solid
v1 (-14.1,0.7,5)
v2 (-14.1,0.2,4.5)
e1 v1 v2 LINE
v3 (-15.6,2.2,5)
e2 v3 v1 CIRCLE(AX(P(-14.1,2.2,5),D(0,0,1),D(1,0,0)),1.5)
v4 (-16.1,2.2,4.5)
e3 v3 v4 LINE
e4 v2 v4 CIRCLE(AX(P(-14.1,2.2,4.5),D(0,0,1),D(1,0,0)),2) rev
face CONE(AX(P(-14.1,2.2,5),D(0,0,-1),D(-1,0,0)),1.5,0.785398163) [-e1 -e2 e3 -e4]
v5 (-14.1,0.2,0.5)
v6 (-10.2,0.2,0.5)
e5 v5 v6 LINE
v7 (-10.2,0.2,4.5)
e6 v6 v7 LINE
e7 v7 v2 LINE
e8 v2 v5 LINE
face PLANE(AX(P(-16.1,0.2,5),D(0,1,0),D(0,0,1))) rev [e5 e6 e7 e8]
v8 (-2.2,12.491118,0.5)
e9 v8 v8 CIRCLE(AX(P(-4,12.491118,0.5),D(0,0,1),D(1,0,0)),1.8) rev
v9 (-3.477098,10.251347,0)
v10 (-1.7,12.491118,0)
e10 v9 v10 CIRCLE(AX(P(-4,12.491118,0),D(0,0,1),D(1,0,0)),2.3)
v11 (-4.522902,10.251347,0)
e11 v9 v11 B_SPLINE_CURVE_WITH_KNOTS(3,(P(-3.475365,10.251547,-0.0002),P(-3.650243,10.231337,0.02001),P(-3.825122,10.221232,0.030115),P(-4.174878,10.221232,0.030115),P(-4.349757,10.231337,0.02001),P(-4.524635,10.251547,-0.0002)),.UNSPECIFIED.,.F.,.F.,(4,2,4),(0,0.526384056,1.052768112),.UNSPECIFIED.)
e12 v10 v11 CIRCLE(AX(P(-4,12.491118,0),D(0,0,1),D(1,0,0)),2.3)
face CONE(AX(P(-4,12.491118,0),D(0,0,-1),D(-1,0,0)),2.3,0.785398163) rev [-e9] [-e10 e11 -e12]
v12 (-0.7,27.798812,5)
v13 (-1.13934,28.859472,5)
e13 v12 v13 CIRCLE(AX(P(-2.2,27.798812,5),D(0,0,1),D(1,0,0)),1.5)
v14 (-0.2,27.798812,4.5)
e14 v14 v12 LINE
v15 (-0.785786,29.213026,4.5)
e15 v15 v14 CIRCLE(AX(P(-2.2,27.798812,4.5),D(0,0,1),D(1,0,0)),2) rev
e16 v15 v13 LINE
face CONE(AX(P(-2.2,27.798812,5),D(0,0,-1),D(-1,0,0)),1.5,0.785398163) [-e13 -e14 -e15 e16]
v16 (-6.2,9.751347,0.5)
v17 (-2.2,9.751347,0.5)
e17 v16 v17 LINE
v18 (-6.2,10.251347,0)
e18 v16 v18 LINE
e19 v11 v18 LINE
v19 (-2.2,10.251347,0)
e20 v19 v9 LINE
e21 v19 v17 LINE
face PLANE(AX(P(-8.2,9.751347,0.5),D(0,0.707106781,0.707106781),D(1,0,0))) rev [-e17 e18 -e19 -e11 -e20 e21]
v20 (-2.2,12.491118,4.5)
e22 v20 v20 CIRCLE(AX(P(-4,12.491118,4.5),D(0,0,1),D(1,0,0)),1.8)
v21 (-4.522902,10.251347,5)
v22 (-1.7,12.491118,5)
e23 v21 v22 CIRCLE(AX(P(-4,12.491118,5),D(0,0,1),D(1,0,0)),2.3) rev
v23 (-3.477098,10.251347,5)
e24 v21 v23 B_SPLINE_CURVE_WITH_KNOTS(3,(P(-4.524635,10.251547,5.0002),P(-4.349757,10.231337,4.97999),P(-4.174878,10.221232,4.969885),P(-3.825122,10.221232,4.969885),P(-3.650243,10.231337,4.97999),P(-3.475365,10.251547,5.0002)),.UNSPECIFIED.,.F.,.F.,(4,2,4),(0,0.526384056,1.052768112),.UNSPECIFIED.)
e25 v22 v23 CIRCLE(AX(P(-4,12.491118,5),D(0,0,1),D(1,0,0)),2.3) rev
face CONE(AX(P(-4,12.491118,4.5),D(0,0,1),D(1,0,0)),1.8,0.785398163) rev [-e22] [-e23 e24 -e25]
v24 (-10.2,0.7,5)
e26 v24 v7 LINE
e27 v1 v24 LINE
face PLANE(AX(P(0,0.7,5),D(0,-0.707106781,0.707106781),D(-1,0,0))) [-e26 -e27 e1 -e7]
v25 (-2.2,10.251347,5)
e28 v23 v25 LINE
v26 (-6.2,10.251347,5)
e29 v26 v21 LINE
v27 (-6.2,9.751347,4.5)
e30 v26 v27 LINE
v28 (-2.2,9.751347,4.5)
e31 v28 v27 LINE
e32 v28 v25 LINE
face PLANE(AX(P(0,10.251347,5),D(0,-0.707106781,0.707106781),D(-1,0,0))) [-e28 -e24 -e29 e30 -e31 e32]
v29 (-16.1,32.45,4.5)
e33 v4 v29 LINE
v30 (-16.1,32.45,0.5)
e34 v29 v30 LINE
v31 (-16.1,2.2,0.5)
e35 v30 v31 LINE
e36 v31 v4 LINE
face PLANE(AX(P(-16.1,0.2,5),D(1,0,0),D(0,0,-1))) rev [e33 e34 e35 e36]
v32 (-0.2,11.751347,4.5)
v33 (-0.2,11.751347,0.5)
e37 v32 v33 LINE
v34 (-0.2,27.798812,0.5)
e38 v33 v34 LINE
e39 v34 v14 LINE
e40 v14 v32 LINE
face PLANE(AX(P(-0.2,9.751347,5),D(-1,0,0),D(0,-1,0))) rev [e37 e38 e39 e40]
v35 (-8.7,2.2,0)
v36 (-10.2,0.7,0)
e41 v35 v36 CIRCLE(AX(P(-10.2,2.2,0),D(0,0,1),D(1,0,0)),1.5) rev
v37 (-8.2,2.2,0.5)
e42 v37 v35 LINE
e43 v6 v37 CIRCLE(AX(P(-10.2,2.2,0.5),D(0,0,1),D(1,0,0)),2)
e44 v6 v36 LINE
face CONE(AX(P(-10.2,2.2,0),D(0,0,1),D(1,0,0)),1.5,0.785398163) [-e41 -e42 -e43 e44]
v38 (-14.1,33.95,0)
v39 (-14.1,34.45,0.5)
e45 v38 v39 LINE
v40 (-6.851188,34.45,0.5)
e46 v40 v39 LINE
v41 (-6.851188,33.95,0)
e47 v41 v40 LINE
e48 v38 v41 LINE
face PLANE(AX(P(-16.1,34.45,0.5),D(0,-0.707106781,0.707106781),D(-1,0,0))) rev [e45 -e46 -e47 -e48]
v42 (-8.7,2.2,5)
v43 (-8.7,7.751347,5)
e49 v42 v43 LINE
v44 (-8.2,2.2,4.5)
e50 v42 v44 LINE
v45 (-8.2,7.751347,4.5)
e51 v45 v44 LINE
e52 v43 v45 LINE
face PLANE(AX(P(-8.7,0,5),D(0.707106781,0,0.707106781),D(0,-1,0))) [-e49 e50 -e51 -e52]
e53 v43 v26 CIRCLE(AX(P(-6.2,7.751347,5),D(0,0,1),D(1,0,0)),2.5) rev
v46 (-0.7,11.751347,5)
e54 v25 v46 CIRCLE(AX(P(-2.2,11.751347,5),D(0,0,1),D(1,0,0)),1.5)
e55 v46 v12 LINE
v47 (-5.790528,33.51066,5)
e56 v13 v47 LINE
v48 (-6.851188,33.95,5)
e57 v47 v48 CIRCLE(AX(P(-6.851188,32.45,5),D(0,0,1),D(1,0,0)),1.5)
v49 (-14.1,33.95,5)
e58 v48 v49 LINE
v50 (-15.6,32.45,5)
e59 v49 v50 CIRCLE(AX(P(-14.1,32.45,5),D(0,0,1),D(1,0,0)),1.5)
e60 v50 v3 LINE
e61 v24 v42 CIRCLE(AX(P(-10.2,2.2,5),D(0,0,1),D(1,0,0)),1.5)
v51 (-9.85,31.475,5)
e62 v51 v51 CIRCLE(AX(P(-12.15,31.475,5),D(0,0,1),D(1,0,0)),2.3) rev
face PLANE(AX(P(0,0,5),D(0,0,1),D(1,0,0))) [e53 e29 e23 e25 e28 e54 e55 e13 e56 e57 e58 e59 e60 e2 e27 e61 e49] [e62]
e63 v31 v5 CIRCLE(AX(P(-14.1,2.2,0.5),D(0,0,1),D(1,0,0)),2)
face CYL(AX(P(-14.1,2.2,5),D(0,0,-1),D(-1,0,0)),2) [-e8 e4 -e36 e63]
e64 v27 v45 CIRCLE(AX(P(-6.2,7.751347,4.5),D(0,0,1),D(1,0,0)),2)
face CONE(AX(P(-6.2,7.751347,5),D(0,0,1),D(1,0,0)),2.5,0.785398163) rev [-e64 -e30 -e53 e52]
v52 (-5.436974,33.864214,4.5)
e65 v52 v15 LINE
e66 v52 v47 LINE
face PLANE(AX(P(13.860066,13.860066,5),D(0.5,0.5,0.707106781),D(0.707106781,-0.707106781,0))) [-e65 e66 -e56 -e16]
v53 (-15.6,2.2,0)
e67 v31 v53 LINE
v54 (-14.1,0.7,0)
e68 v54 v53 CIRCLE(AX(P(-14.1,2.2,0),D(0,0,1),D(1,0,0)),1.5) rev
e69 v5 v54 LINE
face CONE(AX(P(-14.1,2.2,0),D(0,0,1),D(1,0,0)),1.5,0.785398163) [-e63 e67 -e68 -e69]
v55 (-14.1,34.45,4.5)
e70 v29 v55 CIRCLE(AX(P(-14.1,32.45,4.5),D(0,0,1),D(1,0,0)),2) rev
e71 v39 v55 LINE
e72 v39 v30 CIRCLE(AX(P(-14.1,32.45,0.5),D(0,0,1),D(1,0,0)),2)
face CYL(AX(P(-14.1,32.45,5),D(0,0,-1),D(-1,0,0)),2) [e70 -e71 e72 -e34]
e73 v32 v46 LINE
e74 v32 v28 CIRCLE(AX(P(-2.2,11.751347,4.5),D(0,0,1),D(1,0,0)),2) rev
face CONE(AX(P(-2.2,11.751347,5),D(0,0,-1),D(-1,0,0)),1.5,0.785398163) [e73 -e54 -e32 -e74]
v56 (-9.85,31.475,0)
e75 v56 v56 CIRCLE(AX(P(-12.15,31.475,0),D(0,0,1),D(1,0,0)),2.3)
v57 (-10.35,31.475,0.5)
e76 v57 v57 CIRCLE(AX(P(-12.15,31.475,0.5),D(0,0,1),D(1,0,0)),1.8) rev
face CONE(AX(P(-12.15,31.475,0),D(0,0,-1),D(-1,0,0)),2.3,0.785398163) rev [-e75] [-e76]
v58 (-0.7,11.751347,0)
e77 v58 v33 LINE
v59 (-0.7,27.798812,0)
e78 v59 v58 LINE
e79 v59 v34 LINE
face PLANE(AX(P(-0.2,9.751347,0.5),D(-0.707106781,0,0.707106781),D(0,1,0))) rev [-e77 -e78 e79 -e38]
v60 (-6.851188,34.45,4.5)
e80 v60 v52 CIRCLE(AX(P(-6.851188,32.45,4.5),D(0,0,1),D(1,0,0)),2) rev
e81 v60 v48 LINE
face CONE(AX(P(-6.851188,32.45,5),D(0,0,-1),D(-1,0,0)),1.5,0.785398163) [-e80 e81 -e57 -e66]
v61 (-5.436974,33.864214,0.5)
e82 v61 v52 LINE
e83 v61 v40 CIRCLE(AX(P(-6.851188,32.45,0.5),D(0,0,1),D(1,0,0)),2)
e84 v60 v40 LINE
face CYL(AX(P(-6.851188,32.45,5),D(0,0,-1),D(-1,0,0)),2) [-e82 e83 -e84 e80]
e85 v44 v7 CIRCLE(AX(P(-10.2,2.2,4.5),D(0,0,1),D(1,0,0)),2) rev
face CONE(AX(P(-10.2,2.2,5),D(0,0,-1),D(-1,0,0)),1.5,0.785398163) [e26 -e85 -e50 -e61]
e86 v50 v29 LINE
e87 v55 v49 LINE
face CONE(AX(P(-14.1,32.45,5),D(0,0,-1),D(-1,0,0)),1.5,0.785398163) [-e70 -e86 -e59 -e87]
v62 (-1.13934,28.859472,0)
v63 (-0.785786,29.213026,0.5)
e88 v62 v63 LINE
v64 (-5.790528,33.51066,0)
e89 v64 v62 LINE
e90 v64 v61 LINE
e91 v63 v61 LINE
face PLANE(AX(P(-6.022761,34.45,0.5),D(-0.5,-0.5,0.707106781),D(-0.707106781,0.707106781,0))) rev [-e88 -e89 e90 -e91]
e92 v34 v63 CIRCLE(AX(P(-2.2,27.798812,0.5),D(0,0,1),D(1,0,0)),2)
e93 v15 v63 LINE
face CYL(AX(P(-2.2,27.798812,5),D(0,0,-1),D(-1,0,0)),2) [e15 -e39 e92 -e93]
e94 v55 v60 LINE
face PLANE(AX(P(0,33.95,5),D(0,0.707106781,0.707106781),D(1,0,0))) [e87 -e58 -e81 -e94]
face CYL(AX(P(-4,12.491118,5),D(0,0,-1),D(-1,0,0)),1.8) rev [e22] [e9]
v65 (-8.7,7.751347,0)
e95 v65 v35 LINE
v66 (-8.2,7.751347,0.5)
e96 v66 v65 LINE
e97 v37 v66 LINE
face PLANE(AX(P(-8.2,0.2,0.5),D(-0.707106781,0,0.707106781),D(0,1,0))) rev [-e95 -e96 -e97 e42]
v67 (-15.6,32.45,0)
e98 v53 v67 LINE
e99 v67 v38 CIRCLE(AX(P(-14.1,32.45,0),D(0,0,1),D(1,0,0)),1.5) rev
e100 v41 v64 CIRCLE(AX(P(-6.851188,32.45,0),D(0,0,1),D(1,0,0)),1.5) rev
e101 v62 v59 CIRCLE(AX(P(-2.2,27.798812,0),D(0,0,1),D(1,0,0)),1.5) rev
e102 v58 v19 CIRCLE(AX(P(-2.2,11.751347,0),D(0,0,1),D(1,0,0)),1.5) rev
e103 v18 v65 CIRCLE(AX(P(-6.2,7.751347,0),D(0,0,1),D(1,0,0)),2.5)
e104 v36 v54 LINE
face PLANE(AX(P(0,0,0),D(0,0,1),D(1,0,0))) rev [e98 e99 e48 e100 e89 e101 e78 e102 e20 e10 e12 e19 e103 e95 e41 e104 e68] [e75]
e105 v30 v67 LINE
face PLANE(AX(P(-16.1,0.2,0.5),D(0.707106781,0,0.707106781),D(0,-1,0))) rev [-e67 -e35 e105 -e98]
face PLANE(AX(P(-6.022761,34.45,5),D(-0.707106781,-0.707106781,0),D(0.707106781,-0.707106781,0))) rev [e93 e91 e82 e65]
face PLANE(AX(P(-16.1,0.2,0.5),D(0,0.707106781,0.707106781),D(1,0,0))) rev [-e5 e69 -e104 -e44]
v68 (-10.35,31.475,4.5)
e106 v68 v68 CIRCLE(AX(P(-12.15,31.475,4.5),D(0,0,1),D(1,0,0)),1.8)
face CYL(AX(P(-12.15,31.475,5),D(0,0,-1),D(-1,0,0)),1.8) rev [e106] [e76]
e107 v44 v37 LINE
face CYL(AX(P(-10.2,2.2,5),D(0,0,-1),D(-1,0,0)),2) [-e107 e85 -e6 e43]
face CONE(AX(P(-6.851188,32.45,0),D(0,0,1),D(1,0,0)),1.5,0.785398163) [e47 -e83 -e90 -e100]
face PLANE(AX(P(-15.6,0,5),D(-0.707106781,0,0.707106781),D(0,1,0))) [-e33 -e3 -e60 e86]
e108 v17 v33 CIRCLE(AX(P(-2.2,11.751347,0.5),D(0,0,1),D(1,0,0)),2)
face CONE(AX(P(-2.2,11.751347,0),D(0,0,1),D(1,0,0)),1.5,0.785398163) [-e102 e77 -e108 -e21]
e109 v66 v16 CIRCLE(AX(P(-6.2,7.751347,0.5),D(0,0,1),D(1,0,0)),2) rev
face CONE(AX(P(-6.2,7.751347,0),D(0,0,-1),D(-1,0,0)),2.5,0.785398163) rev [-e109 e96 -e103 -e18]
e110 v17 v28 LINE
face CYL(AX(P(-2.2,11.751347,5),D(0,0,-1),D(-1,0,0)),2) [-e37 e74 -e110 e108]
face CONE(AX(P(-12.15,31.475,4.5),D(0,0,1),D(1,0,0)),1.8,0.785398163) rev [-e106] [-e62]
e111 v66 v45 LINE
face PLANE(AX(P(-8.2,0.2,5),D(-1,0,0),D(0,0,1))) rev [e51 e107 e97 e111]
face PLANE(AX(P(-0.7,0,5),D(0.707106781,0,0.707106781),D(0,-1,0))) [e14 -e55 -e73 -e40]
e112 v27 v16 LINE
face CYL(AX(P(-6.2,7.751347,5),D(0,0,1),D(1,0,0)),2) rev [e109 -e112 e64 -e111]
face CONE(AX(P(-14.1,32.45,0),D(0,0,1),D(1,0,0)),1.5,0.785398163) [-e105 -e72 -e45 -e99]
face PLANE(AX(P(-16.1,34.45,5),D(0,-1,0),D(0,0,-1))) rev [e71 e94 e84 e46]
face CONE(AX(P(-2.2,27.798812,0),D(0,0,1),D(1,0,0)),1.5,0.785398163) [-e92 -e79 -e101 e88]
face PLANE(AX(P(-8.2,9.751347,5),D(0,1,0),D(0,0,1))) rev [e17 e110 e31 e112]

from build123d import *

# Parameters (mm, degrees)
SKIZZE1_R                       = 1.8
AUFSATZ_LINEAR_AUSTRAGEN1_DEPTH = 5
VERRUNDUNG1_R                   = 2
FASE1_SIZE                      = 0.5


with BuildPart() as part:
    # Skizze1 → Aufsatz-Linear austragen1 (new body)
    with BuildSketch(Plane.XY):
        Polygon((-0.2, 9.751346921), (-0.2, 28.627239348), (-6.022760652, 34.45), (-16.1, 34.45), (-16.1, 0.2), (-8.2, 0.2), (-8.2, 9.751346921), align=None)
        with Locations((-12.15, 31.475)):
            Circle(SKIZZE1_R, mode=Mode.SUBTRACT)
        with Locations((-4, 12.49111782)):
            Circle(SKIZZE1_R, mode=Mode.SUBTRACT)
    extrude(amount=AUFSATZ_LINEAR_AUSTRAGEN1_DEPTH)

    # Verrundung1
    verrundung1_edges = [part.edges().sort_by_distance(p)[0] for p in [
        (-8.2, 9.751346921, 2.5),
        (-8.2, 0.2, 2.5),
        (-16.1, 0.2, 2.5),
        (-16.1, 34.45, 2.5),
        (-6.022760652, 34.45, 2.5),
        (-0.2, 28.627239348, 2.5),
        (-0.2, 9.751346921, 2.5),
    ]]
    fillet(verrundung1_edges, radius=VERRUNDUNG1_R)

    # Fase1
    # the kernel refuses this chamfer: 0.5 mm, written as the material it takes off along each edge
    with BuildSketch(Plane(origin=(-12.15, 31.475, 0), x_dir=(1, 0, 0), z_dir=(0, -1, 0))) as fase1_piece_1:
        Polygon((1.8 + FASE1_SIZE, 0), (1.8, FASE1_SIZE), (1.8, 0), align=None)
    revolve(axis=Axis((-12.15, 31.475, 0), (0, 0, 1)), mode=Mode.SUBTRACT)
    with BuildSketch(Plane(origin=(-12.15, 31.475, 5), x_dir=(1, 0, 0), z_dir=(0, -1, 0))) as fase1_piece_2:
        Polygon((1.8 + FASE1_SIZE, 0), (1.8, -FASE1_SIZE), (1.8, 0), align=None)
    revolve(axis=Axis((-12.15, 31.475, 5), (0, 0, 1)), mode=Mode.SUBTRACT)
    with BuildSketch(Plane(origin=(-4, 12.49111782, 0), x_dir=(1, 0, 0), z_dir=(0, -1, 0))) as fase1_piece_3:
        Polygon((1.8 + FASE1_SIZE, 0), (1.8, FASE1_SIZE), (1.8, 0), align=None)
    revolve(axis=Axis((-4, 12.49111782, 0), (0, 0, 1)), mode=Mode.SUBTRACT)
    with BuildSketch(Plane(origin=(-4, 12.49111782, 5), x_dir=(1, 0, 0), z_dir=(0, -1, 0))) as fase1_piece_4:
        Polygon((1.8 + FASE1_SIZE, 0), (1.8, -FASE1_SIZE), (1.8, 0), align=None)
    revolve(axis=Axis((-4, 12.49111782, 5), (0, 0, 1)), mode=Mode.SUBTRACT)
    with BuildSketch(Plane(origin=(-0.2, 11.751346921, 0), x_dir=(0.027495876610586382, 0, 0.9996219169112968), z_dir=(0, 1, 0))) as fase1_piece_5:
        Polygon((FASE1_SIZE * 0.999621916911, -FASE1_SIZE * 0.0274958766106), (-FASE1_SIZE * 0.0274958766106, -FASE1_SIZE * 0.999621916911), (0, 0), align=None)
    extrude(amount=16.047465302, mode=Mode.SUBTRACT)
    with BuildSketch(Plane(origin=(-0.2, 11.751346921, 5), x_dir=(0.027495876610586403, 0, -0.9996219169112968), z_dir=(0, 1, 0))) as fase1_piece_6:
        Polygon((FASE1_SIZE * 0.999621916911, FASE1_SIZE * 0.0274958766106), (-FASE1_SIZE * 0.0274958766106, FASE1_SIZE * 0.999621916911), (0, 0), align=None)
    extrude(amount=16.047465302, mode=Mode.SUBTRACT)
    with BuildSketch(Plane(origin=(-6.2, 9.751346921, 0), x_dir=(0, 0.9996219169112968, -0.02749587661058639), z_dir=(1, 0, 0))) as fase1_piece_7:
        Polygon((FASE1_SIZE * 0.999621916911, FASE1_SIZE * 0.0274958766106), (-FASE1_SIZE * 0.0274958766106, FASE1_SIZE * 0.999621916911), (0, 0), align=None)
    extrude(amount=4, mode=Mode.SUBTRACT)
    with BuildSketch(Plane(origin=(-8.2, 2.2, 0), x_dir=(-0.9996219169112968, 0, -0.02749587661058639), z_dir=(0, 1, 0))) as fase1_piece_8:
        Polygon((FASE1_SIZE * 0.999621916911, FASE1_SIZE * 0.0274958766106), (-FASE1_SIZE * 0.0274958766106, FASE1_SIZE * 0.999621916911), (0, 0), align=None)
    extrude(amount=5.551346921, mode=Mode.SUBTRACT)
    with BuildSketch(Plane(origin=(-14.1, 0.2, 0), x_dir=(0, 0.9996219169112968, -0.027495876610586372), z_dir=(1, 0, 0))) as fase1_piece_9:
        Polygon((FASE1_SIZE * 0.999621916911, FASE1_SIZE * 0.0274958766106), (-FASE1_SIZE * 0.0274958766106, FASE1_SIZE * 0.999621916911), (0, 0), align=None)
    extrude(amount=3.9, mode=Mode.SUBTRACT)
    with BuildSketch(Plane(origin=(-16.1, 32.45, 0), x_dir=(0.9996219169112968, 0, -0.02749587661058639), z_dir=(0, -1, 0))) as fase1_piece_10:
        Polygon((FASE1_SIZE * 0.999621916911, FASE1_SIZE * 0.0274958766106), (-FASE1_SIZE * 0.0274958766106, FASE1_SIZE * 0.999621916911), (0, 0), align=None)
    extrude(amount=30.25, mode=Mode.SUBTRACT)
    with BuildSketch(Plane(origin=(-6.851187777, 34.45, 0), x_dir=(0, -0.9996219169112968, -0.027495876610586483), z_dir=(-1, 0, 0))) as fase1_piece_11:
        Polygon((FASE1_SIZE * 0.999621916911, FASE1_SIZE * 0.0274958766106), (-FASE1_SIZE * 0.0274958766106, FASE1_SIZE * 0.999621916911), (0, 0), align=None)
    extrude(amount=7.248812223, mode=Mode.SUBTRACT)
    with BuildSketch(Plane(origin=(-0.785786438, 29.213025785, 0), x_dir=(-0.7068394360706736, -0.7068394360706733, -0.027495876610586348), z_dir=(-0.7071067811865475, 0.7071067811865477, 0))) as fase1_piece_12:
        Polygon((FASE1_SIZE * 0.999621916911, FASE1_SIZE * 0.0274958766106), (-FASE1_SIZE * 0.0274958766106, FASE1_SIZE * 0.999621916911), (0, 0), align=None)
    extrude(amount=6.577772835, mode=Mode.SUBTRACT)
    with BuildSketch(Plane(origin=(-2.2, 27.798812223, 0), x_dir=(1, 0, 0), z_dir=(0, -1, 0))) as fase1_piece_13:
        Polygon((2 - FASE1_SIZE, 0), (2, FASE1_SIZE), (2, 0), align=None)
    revolve(axis=Axis((-2.2, 27.798812223, 0), (0, 0, 1)), revolution_arc=45, mode=Mode.SUBTRACT)
    with BuildSketch(Plane(origin=(-6.851187777, 32.45, 0), x_dir=(0.7071067811865487, 0.7071067811865465, 0), z_dir=(0.7071067811865465, -0.7071067811865487, 0))) as fase1_piece_14:
        Polygon((2 - FASE1_SIZE, 0), (2, FASE1_SIZE), (2, 0), align=None)
    revolve(axis=Axis((-6.851187777, 32.45, 0), (0, 0, 1)), revolution_arc=45, mode=Mode.SUBTRACT)
    with BuildSketch(Plane(origin=(-14.1, 32.45, 0), x_dir=(0, 1, 0), z_dir=(1, 0, 0))) as fase1_piece_15:
        Polygon((2 - FASE1_SIZE, 0), (2, FASE1_SIZE), (2, 0), align=None)
    revolve(axis=Axis((-14.1, 32.45, 0), (0, 0, 1)), revolution_arc=90, mode=Mode.SUBTRACT)
    with BuildSketch(Plane(origin=(-14.1, 2.2, 0), x_dir=(-1, 0, 0), z_dir=(0, 1, 0))) as fase1_piece_16:
        Polygon((2 - FASE1_SIZE, 0), (2, FASE1_SIZE), (2, 0), align=None)
    revolve(axis=Axis((-14.1, 2.2, 0), (0, 0, 1)), revolution_arc=90, mode=Mode.SUBTRACT)
    with BuildSketch(Plane(origin=(-10.2, 2.2, 0), x_dir=(0, -1, 0), z_dir=(-1, 0, 0))) as fase1_piece_17:
        Polygon((2 - FASE1_SIZE, 0), (2, FASE1_SIZE), (2, 0), align=None)
    revolve(axis=Axis((-10.2, 2.2, 0), (0, 0, 1)), revolution_arc=90, mode=Mode.SUBTRACT)
    with BuildSketch(Plane(origin=(-2.2, 11.751346921, 0), x_dir=(1, 0, 0), z_dir=(0, 1, 0))) as fase1_piece_18:
        Polygon((2 - FASE1_SIZE, 0), (2, -FASE1_SIZE), (2, 0), align=None)
    revolve(axis=Axis((-2.2, 11.751346921, 0), (0, 0, -1)), revolution_arc=90, mode=Mode.SUBTRACT)
    with BuildSketch(Plane(origin=(-6.2, 9.751346921, 5), x_dir=(0, 0.9996219169112968, 0.027495876610585647), z_dir=(1, 0, 0))) as fase1_piece_19:
        Polygon((FASE1_SIZE * 0.999621916911, -FASE1_SIZE * 0.0274958766106), (-FASE1_SIZE * 0.0274958766106, -FASE1_SIZE * 0.999621916911), (0, 0), align=None)
    extrude(amount=4, mode=Mode.SUBTRACT)
    with BuildSketch(Plane(origin=(-0.785786438, 29.213025785, 5), x_dir=(-0.7068394360706736, -0.7068394360706733, 0.027495876610585605), z_dir=(-0.7071067811865475, 0.7071067811865477, 0))) as fase1_piece_20:
        Polygon((FASE1_SIZE * 0.999621916911, -FASE1_SIZE * 0.0274958766106), (-FASE1_SIZE * 0.0274958766106, -FASE1_SIZE * 0.999621916911), (0, 0), align=None)
    extrude(amount=6.577772835, mode=Mode.SUBTRACT)
    with BuildSketch(Plane(origin=(-6.851187777, 34.45, 5), x_dir=(0, -0.9996219169112968, 0.02749587661058574), z_dir=(-1, 0, 0))) as fase1_piece_21:
        Polygon((FASE1_SIZE * 0.999621916911, -FASE1_SIZE * 0.0274958766106), (-FASE1_SIZE * 0.0274958766106, -FASE1_SIZE * 0.999621916911), (0, 0), align=None)
    extrude(amount=7.248812223, mode=Mode.SUBTRACT)
    with BuildSketch(Plane(origin=(-16.1, 32.45, 5), x_dir=(0.9996219169112968, 0, 0.027495876610585647), z_dir=(0, -1, 0))) as fase1_piece_22:
        Polygon((FASE1_SIZE * 0.999621916911, -FASE1_SIZE * 0.0274958766106), (-FASE1_SIZE * 0.0274958766106, -FASE1_SIZE * 0.999621916911), (0, 0), align=None)
    extrude(amount=30.25, mode=Mode.SUBTRACT)
    with BuildSketch(Plane(origin=(-14.1, 0.2, 5), x_dir=(0, 0.9996219169112968, 0.02749587661058563), z_dir=(1, 0, 0))) as fase1_piece_23:
        Polygon((FASE1_SIZE * 0.999621916911, -FASE1_SIZE * 0.0274958766106), (-FASE1_SIZE * 0.0274958766106, -FASE1_SIZE * 0.999621916911), (0, 0), align=None)
    extrude(amount=3.9, mode=Mode.SUBTRACT)
    with BuildSketch(Plane(origin=(-8.2, 2.2, 5), x_dir=(-0.9996219169112968, 0, 0.027495876610585647), z_dir=(0, 1, 0))) as fase1_piece_24:
        Polygon((FASE1_SIZE * 0.999621916911, -FASE1_SIZE * 0.0274958766106), (-FASE1_SIZE * 0.0274958766106, -FASE1_SIZE * 0.999621916911), (0, 0), align=None)
    extrude(amount=5.551346921, mode=Mode.SUBTRACT)
    with BuildSketch(Plane(origin=(-2.2, 27.798812223, 5), x_dir=(1, 0, 0), z_dir=(0, -1, 0))) as fase1_piece_25:
        Polygon((2, -FASE1_SIZE), (2 - FASE1_SIZE, 0), (2, 0), align=None)
    revolve(axis=Axis((-2.2, 27.798812223, 5), (0, 0, 1)), revolution_arc=45, mode=Mode.SUBTRACT)
    with BuildSketch(Plane(origin=(-6.851187777, 32.45, 5), x_dir=(0.7071067811865487, 0.7071067811865465, 0), z_dir=(0.7071067811865465, -0.7071067811865487, 0))) as fase1_piece_26:
        Polygon((2 - FASE1_SIZE, 0), (2, -FASE1_SIZE), (2, 0), align=None)
    revolve(axis=Axis((-6.851187777, 32.45, 5), (0, 0, 1)), revolution_arc=45, mode=Mode.SUBTRACT)
    with BuildSketch(Plane(origin=(-14.1, 32.45, 5), x_dir=(0, 1, 0), z_dir=(1, 0, 0))) as fase1_piece_27:
        Polygon((2 - FASE1_SIZE, 0), (2, -FASE1_SIZE), (2, 0), align=None)
    revolve(axis=Axis((-14.1, 32.45, 5), (0, 0, 1)), revolution_arc=90, mode=Mode.SUBTRACT)
    with BuildSketch(Plane(origin=(-14.1, 2.2, 5), x_dir=(-1, 0, 0), z_dir=(0, 1, 0))) as fase1_piece_28:
        Polygon((2 - FASE1_SIZE, 0), (2, -FASE1_SIZE), (2, 0), align=None)
    revolve(axis=Axis((-14.1, 2.2, 5), (0, 0, 1)), revolution_arc=90, mode=Mode.SUBTRACT)
    with BuildSketch(Plane(origin=(-10.2, 2.2, 5), x_dir=(0, -1, 0), z_dir=(-1, 0, 0))) as fase1_piece_29:
        Polygon((2 - FASE1_SIZE, 0), (2, -FASE1_SIZE), (2, 0), align=None)
    revolve(axis=Axis((-10.2, 2.2, 5), (0, 0, 1)), revolution_arc=90, mode=Mode.SUBTRACT)
    with BuildSketch(Plane(origin=(-2.2, 11.751346921, 5), x_dir=(1, 0, 0), z_dir=(0, 1, 0))) as fase1_piece_30:
        Polygon((2, FASE1_SIZE), (2 - FASE1_SIZE, 0), (2, 0), align=None)
    revolve(axis=Axis((-2.2, 11.751346921, 5), (0, 0, -1)), revolution_arc=90, mode=Mode.SUBTRACT)
    with BuildSketch(Plane(origin=(-6.2, 7.751346921, 0), x_dir=(-1, 0, 0), z_dir=(0, -1, 0))) as fase1_piece_31:
        Polygon((2 + FASE1_SIZE, 0), (2, -FASE1_SIZE), (2, 0), align=None)
    revolve(axis=Axis((-6.2, 7.751346921, 0), (0, 0, -1)), revolution_arc=90, mode=Mode.SUBTRACT)
    with BuildSketch(Plane(origin=(-6.2, 7.751346921, 5), x_dir=(-1, 0, 0), z_dir=(0, -1, 0))) as fase1_piece_32:
        Polygon((2 + FASE1_SIZE, 0), (2, FASE1_SIZE), (2, 0), align=None)
    revolve(axis=Axis((-6.2, 7.751346921, 5), (0, 0, -1)), revolution_arc=90, mode=Mode.SUBTRACT)


solid = part.part
